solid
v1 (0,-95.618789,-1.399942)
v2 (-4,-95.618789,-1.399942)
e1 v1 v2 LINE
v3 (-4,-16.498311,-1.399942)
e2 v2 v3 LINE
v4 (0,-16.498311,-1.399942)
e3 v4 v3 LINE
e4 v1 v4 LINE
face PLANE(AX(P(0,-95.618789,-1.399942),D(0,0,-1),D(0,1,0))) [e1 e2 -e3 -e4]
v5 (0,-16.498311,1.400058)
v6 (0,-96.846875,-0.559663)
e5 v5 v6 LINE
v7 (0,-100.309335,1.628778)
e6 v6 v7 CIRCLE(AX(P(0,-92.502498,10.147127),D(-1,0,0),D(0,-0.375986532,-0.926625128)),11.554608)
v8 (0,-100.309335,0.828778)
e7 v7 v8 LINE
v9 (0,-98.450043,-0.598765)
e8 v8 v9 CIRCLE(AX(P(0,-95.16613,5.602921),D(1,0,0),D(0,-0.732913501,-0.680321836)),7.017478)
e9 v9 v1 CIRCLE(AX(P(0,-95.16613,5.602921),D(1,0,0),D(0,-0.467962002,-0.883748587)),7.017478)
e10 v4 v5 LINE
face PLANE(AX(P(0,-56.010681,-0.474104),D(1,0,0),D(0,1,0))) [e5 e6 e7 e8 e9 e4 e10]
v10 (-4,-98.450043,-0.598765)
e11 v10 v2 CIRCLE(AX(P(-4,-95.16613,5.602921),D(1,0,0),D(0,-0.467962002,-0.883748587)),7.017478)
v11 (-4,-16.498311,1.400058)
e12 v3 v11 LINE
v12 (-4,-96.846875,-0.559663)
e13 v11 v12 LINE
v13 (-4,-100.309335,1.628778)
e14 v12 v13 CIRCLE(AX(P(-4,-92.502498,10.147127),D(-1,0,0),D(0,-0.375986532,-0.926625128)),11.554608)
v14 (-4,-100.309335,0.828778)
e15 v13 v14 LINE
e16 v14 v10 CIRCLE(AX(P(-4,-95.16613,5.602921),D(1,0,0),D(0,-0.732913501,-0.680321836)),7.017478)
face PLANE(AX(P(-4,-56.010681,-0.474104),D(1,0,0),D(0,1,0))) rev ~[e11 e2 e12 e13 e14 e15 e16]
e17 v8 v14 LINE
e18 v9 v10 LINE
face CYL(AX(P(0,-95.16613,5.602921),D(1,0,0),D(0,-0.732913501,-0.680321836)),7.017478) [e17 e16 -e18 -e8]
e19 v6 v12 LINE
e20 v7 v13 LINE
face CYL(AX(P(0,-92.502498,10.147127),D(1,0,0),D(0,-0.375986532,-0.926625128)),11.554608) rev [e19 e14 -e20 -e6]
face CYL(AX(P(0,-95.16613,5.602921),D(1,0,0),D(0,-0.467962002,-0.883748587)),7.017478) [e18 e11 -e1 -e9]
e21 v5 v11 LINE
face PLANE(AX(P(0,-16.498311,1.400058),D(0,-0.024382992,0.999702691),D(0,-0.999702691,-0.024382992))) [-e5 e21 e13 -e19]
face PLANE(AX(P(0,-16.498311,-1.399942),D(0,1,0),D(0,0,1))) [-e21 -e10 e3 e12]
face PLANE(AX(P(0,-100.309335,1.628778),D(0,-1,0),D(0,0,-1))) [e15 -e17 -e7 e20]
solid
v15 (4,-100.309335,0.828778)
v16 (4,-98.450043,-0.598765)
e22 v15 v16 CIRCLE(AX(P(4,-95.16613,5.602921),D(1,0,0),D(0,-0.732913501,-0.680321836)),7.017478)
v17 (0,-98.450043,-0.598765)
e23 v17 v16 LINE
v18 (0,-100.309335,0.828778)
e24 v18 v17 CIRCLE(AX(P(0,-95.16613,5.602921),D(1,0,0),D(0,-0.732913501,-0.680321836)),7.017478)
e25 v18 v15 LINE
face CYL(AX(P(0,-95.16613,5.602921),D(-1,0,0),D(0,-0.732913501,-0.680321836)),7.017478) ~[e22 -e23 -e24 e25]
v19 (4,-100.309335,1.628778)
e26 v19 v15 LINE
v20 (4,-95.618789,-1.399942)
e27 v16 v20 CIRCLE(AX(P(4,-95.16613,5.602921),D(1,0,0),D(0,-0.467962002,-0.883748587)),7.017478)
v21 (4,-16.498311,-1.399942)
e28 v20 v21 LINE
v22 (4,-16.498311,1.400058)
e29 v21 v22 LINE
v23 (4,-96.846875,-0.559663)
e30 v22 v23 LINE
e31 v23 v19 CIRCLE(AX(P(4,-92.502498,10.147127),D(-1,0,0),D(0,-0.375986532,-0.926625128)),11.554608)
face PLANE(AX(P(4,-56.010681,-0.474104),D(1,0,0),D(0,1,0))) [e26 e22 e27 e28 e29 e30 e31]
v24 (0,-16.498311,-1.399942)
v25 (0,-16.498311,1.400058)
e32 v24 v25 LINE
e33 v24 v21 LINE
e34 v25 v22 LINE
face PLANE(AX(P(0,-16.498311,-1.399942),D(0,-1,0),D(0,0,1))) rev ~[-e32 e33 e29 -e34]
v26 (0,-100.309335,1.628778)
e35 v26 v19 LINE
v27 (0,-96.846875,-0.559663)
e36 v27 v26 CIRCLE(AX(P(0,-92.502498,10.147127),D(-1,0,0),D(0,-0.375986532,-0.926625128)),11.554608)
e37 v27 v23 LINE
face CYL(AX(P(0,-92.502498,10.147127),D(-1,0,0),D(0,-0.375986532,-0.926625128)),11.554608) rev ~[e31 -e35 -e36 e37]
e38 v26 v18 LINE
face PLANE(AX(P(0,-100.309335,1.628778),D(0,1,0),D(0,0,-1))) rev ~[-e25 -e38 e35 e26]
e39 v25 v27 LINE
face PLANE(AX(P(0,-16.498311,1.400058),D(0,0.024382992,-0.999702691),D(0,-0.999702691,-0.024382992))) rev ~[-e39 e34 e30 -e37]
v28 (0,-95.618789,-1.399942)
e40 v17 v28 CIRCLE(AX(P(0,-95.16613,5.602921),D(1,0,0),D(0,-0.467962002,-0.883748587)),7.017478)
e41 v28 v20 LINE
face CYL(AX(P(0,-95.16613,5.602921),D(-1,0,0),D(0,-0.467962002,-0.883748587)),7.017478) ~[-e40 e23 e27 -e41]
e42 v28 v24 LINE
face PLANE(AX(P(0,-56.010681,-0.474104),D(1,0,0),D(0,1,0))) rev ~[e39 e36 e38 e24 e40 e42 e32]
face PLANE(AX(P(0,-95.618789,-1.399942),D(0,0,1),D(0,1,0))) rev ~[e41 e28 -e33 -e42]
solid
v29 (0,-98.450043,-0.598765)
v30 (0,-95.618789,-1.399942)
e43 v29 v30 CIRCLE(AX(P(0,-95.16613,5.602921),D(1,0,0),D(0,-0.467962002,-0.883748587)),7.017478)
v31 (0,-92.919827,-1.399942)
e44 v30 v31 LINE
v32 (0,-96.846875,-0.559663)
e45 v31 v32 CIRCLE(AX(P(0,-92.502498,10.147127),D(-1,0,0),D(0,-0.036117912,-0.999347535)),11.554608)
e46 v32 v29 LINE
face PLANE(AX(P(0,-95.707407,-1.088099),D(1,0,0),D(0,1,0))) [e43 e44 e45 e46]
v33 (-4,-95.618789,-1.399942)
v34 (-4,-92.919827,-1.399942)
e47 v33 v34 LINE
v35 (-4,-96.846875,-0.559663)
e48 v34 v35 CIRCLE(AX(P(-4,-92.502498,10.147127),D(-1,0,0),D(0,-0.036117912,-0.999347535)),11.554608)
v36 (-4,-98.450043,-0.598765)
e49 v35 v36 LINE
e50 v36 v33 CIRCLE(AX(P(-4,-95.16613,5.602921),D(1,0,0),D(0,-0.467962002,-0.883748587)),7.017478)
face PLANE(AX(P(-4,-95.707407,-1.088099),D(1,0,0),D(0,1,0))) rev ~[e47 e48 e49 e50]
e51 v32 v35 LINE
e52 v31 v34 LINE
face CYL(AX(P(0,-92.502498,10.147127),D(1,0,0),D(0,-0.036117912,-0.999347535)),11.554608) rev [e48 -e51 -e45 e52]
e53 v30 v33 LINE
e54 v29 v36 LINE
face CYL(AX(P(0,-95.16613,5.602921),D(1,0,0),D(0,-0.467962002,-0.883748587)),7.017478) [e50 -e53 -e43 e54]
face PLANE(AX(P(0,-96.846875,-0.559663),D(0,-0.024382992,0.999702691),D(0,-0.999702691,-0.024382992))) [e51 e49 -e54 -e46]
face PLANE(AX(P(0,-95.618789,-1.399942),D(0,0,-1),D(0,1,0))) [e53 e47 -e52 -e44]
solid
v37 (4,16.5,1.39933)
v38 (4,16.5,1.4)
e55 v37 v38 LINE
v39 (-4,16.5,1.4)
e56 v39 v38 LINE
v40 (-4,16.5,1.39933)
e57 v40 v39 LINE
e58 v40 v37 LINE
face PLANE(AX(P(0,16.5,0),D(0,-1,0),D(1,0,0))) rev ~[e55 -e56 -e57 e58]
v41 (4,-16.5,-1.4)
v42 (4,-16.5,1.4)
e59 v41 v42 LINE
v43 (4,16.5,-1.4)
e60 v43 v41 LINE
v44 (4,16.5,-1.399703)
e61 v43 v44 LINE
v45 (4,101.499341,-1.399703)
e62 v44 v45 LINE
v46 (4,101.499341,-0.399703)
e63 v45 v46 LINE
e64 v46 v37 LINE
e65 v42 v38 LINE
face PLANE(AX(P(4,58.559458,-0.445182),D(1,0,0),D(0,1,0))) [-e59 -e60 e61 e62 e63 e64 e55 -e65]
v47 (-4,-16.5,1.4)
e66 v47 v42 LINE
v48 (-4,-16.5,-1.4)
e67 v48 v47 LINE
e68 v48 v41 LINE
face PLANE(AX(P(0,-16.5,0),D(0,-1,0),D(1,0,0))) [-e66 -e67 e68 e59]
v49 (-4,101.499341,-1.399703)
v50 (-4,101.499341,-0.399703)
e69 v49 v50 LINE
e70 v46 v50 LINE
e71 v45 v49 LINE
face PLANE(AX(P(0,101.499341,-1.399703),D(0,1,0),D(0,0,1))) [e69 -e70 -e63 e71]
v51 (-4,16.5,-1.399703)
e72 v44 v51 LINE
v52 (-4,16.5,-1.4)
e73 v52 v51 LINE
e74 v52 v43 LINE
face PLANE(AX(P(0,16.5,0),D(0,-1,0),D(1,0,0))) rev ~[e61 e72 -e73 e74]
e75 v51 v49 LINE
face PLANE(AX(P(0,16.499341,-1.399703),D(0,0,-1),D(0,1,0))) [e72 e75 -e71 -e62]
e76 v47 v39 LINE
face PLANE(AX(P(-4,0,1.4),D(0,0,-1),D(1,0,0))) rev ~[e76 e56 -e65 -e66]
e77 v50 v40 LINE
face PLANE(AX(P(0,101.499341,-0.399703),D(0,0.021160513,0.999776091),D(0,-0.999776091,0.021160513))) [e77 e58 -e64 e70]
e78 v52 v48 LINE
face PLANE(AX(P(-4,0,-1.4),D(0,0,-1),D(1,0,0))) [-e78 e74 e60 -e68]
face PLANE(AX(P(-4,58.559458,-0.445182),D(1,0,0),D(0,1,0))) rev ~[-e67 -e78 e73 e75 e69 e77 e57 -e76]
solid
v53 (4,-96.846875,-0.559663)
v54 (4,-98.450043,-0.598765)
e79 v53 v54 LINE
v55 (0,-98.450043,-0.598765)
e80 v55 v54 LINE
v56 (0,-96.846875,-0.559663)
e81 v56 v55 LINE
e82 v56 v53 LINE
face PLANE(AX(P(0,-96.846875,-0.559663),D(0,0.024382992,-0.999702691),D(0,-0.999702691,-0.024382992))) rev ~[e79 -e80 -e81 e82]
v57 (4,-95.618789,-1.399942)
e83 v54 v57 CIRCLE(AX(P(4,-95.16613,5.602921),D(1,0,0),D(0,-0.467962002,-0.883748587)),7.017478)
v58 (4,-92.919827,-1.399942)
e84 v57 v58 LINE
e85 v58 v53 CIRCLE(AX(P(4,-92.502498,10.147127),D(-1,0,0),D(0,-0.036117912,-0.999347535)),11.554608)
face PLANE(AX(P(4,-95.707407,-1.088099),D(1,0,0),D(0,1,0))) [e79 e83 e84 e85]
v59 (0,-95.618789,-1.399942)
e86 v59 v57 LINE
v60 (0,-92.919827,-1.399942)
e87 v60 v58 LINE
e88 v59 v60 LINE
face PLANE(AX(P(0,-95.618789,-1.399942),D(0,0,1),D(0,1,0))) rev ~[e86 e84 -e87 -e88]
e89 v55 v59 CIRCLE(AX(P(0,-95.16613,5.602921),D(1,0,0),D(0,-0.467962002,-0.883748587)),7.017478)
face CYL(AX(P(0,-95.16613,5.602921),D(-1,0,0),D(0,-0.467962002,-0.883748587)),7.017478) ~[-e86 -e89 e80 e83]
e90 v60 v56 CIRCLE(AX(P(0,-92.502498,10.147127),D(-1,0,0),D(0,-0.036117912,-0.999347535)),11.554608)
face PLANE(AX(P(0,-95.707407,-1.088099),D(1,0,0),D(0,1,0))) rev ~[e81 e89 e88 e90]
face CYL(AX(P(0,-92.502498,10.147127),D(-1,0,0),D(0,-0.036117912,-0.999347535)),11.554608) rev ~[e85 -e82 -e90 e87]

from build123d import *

# Parameters (mm, degrees)
F0_W     = 8
F0_H     = 2.8
F1_DEPTH = 16.5
F2_DEPTH = 16.5
F4_DEPTH = 4
F5_DEPTH = 4
F6_DEPTH = 4
F7_DEPTH = 4


# Not quite as in the source:
# - a feature names something its author has since deleted; it is built from what else it names


with BuildPart() as f1:
    # F0 (on Front) → F1 (new body)
    with BuildSketch(Plane.XZ):
        Rectangle(F0_W, F0_H)
    extrude(amount=F1_DEPTH)

    # F0 (on Front) → F2 (join)
    with BuildSketch(Plane.XZ):
        Rectangle(F0_W, F0_H)
    extrude(amount=-F2_DEPTH)

    # F3 (on Right) → F4 (join)
    with BuildSketch(Plane.YZ):
        Polygon((101.4993405342, -0.3997026253), (16.4993405342, 1.3993438333), (16.4993405342, -1.3997026253), (101.4993405342, -1.3997026253), align=None)
    extrude(amount=F4_DEPTH)

    # F3 (on Right) → F5 (join)
    with BuildSketch(Plane.YZ):
        Polygon((101.4993405342, -0.3997026253), (16.4993405342, 1.3993438333), (16.4993405342, -1.3997026253), (101.4993405342, -1.3997026253), align=None)
    extrude(amount=-F5_DEPTH)


with BuildPart() as f4:
    # F3 (on Right) → F4, piece 2 (new body)
    with BuildSketch(Plane.YZ):
        with BuildLine():
            Line((-94.7134718299, -1.3999422081), (-92.9198265076, -1.3999422081))
            ThreePointArc((-92.9198265076, -1.3999422081), (-94.9201368355, -1.1517222137), (-96.8468752203, -0.5596632892))
            Line((-96.8468752203, -0.5596632892), (-98.4500434109, -0.5987649524))
            ThreePointArc((-98.4500434109, -0.5987649524), (-97.0768797518, -1.1494141491), (-95.618788992, -1.3999422081))
            Line((-95.618788992, -1.3999422081), (-94.7134718299, -1.3999422081))
        make_face()
    extrude(amount=F4_DEPTH)


with BuildPart() as f5:
    # F3 (on Right) → F5, piece 2 (new body)
    with BuildSketch(Plane.YZ):
        with BuildLine():
            Line((-94.7134718299, -1.3999422081), (-92.9198265076, -1.3999422081))
            ThreePointArc((-92.9198265076, -1.3999422081), (-94.9201368355, -1.1517222137), (-96.8468752203, -0.5596632892))
            Line((-96.8468752203, -0.5596632892), (-98.4500434109, -0.5987649524))
            ThreePointArc((-98.4500434109, -0.5987649524), (-97.0768797518, -1.1494141491), (-95.618788992, -1.3999422081))
            Line((-95.618788992, -1.3999422081), (-94.7134718299, -1.3999422081))
        make_face()
    extrude(amount=-F5_DEPTH)


with BuildPart() as f6:
    # F3 (on Right) → F6 (new body)
    with BuildSketch(Plane.YZ):
        with BuildLine():
            Line((-92.9198265076, -1.3999422081), (-16.4983108938, -1.3999422081))
            Line((-16.4983108938, -1.3999422081), (-16.4983108938, 1.4000577919))
            Line((-16.4983108938, 1.4000577919), (-96.8468752203, -0.5596632892))
            ThreePointArc((-96.8468752203, -0.5596632892), (-94.9201368355, -1.1517222137), (-92.9198265076, -1.3999422081))
        make_face()
        with BuildLine():
            Line((-98.4500434109, -0.5987649524), (-96.8468752203, -0.5596632892))
            ThreePointArc((-96.8468752203, -0.5596632892), (-98.6758535312, 0.3799035578), (-100.3093346953, 1.6287777741))
            Line((-100.3093346953, 1.6287777741), (-100.3093346953, 0.8287777741))
            ThreePointArc((-100.3093346953, 0.8287777741), (-99.4397174277, 0.036822948), (-98.4500434109, -0.5987649524))
        make_face()
        with BuildLine():
            Line((-94.7134718299, -1.3999422081), (-92.9198265076, -1.3999422081))
            ThreePointArc((-92.9198265076, -1.3999422081), (-94.9201368355, -1.1517222137), (-96.8468752203, -0.5596632892))
            Line((-96.8468752203, -0.5596632892), (-98.4500434109, -0.5987649524))
            ThreePointArc((-98.4500434109, -0.5987649524), (-97.0768797518, -1.1494141491), (-95.618788992, -1.3999422081))
            Line((-95.618788992, -1.3999422081), (-94.7134718299, -1.3999422081))
        make_face()
    extrude(amount=F6_DEPTH)


with BuildPart() as f7:
    # F3 (on Right) → F7 (new body)
    with BuildSketch(Plane.YZ):
        with BuildLine():
            Line((-92.9198265076, -1.3999422081), (-16.4983108938, -1.3999422081))
            Line((-16.4983108938, -1.3999422081), (-16.4983108938, 1.4000577919))
            Line((-16.4983108938, 1.4000577919), (-96.8468752203, -0.5596632892))
            ThreePointArc((-96.8468752203, -0.5596632892), (-94.9201368355, -1.1517222137), (-92.9198265076, -1.3999422081))
        make_face()
        with BuildLine():
            Line((-98.4500434109, -0.5987649524), (-96.8468752203, -0.5596632892))
            ThreePointArc((-96.8468752203, -0.5596632892), (-98.6758535312, 0.3799035578), (-100.3093346953, 1.6287777741))
            Line((-100.3093346953, 1.6287777741), (-100.3093346953, 0.8287777741))
            ThreePointArc((-100.3093346953, 0.8287777741), (-99.4397174277, 0.036822948), (-98.4500434109, -0.5987649524))
        make_face()
        with BuildLine():
            Line((-94.7134718299, -1.3999422081), (-92.9198265076, -1.3999422081))
            ThreePointArc((-92.9198265076, -1.3999422081), (-94.9201368355, -1.1517222137), (-96.8468752203, -0.5596632892))
            Line((-96.8468752203, -0.5596632892), (-98.4500434109, -0.5987649524))
            ThreePointArc((-98.4500434109, -0.5987649524), (-97.0768797518, -1.1494141491), (-95.618788992, -1.3999422081))
            Line((-95.618788992, -1.3999422081), (-94.7134718299, -1.3999422081))
        make_face()
    extrude(amount=-F7_DEPTH)


solid = Compound([f1.part, f4.part, f5.part, f6.part, f7.part])
